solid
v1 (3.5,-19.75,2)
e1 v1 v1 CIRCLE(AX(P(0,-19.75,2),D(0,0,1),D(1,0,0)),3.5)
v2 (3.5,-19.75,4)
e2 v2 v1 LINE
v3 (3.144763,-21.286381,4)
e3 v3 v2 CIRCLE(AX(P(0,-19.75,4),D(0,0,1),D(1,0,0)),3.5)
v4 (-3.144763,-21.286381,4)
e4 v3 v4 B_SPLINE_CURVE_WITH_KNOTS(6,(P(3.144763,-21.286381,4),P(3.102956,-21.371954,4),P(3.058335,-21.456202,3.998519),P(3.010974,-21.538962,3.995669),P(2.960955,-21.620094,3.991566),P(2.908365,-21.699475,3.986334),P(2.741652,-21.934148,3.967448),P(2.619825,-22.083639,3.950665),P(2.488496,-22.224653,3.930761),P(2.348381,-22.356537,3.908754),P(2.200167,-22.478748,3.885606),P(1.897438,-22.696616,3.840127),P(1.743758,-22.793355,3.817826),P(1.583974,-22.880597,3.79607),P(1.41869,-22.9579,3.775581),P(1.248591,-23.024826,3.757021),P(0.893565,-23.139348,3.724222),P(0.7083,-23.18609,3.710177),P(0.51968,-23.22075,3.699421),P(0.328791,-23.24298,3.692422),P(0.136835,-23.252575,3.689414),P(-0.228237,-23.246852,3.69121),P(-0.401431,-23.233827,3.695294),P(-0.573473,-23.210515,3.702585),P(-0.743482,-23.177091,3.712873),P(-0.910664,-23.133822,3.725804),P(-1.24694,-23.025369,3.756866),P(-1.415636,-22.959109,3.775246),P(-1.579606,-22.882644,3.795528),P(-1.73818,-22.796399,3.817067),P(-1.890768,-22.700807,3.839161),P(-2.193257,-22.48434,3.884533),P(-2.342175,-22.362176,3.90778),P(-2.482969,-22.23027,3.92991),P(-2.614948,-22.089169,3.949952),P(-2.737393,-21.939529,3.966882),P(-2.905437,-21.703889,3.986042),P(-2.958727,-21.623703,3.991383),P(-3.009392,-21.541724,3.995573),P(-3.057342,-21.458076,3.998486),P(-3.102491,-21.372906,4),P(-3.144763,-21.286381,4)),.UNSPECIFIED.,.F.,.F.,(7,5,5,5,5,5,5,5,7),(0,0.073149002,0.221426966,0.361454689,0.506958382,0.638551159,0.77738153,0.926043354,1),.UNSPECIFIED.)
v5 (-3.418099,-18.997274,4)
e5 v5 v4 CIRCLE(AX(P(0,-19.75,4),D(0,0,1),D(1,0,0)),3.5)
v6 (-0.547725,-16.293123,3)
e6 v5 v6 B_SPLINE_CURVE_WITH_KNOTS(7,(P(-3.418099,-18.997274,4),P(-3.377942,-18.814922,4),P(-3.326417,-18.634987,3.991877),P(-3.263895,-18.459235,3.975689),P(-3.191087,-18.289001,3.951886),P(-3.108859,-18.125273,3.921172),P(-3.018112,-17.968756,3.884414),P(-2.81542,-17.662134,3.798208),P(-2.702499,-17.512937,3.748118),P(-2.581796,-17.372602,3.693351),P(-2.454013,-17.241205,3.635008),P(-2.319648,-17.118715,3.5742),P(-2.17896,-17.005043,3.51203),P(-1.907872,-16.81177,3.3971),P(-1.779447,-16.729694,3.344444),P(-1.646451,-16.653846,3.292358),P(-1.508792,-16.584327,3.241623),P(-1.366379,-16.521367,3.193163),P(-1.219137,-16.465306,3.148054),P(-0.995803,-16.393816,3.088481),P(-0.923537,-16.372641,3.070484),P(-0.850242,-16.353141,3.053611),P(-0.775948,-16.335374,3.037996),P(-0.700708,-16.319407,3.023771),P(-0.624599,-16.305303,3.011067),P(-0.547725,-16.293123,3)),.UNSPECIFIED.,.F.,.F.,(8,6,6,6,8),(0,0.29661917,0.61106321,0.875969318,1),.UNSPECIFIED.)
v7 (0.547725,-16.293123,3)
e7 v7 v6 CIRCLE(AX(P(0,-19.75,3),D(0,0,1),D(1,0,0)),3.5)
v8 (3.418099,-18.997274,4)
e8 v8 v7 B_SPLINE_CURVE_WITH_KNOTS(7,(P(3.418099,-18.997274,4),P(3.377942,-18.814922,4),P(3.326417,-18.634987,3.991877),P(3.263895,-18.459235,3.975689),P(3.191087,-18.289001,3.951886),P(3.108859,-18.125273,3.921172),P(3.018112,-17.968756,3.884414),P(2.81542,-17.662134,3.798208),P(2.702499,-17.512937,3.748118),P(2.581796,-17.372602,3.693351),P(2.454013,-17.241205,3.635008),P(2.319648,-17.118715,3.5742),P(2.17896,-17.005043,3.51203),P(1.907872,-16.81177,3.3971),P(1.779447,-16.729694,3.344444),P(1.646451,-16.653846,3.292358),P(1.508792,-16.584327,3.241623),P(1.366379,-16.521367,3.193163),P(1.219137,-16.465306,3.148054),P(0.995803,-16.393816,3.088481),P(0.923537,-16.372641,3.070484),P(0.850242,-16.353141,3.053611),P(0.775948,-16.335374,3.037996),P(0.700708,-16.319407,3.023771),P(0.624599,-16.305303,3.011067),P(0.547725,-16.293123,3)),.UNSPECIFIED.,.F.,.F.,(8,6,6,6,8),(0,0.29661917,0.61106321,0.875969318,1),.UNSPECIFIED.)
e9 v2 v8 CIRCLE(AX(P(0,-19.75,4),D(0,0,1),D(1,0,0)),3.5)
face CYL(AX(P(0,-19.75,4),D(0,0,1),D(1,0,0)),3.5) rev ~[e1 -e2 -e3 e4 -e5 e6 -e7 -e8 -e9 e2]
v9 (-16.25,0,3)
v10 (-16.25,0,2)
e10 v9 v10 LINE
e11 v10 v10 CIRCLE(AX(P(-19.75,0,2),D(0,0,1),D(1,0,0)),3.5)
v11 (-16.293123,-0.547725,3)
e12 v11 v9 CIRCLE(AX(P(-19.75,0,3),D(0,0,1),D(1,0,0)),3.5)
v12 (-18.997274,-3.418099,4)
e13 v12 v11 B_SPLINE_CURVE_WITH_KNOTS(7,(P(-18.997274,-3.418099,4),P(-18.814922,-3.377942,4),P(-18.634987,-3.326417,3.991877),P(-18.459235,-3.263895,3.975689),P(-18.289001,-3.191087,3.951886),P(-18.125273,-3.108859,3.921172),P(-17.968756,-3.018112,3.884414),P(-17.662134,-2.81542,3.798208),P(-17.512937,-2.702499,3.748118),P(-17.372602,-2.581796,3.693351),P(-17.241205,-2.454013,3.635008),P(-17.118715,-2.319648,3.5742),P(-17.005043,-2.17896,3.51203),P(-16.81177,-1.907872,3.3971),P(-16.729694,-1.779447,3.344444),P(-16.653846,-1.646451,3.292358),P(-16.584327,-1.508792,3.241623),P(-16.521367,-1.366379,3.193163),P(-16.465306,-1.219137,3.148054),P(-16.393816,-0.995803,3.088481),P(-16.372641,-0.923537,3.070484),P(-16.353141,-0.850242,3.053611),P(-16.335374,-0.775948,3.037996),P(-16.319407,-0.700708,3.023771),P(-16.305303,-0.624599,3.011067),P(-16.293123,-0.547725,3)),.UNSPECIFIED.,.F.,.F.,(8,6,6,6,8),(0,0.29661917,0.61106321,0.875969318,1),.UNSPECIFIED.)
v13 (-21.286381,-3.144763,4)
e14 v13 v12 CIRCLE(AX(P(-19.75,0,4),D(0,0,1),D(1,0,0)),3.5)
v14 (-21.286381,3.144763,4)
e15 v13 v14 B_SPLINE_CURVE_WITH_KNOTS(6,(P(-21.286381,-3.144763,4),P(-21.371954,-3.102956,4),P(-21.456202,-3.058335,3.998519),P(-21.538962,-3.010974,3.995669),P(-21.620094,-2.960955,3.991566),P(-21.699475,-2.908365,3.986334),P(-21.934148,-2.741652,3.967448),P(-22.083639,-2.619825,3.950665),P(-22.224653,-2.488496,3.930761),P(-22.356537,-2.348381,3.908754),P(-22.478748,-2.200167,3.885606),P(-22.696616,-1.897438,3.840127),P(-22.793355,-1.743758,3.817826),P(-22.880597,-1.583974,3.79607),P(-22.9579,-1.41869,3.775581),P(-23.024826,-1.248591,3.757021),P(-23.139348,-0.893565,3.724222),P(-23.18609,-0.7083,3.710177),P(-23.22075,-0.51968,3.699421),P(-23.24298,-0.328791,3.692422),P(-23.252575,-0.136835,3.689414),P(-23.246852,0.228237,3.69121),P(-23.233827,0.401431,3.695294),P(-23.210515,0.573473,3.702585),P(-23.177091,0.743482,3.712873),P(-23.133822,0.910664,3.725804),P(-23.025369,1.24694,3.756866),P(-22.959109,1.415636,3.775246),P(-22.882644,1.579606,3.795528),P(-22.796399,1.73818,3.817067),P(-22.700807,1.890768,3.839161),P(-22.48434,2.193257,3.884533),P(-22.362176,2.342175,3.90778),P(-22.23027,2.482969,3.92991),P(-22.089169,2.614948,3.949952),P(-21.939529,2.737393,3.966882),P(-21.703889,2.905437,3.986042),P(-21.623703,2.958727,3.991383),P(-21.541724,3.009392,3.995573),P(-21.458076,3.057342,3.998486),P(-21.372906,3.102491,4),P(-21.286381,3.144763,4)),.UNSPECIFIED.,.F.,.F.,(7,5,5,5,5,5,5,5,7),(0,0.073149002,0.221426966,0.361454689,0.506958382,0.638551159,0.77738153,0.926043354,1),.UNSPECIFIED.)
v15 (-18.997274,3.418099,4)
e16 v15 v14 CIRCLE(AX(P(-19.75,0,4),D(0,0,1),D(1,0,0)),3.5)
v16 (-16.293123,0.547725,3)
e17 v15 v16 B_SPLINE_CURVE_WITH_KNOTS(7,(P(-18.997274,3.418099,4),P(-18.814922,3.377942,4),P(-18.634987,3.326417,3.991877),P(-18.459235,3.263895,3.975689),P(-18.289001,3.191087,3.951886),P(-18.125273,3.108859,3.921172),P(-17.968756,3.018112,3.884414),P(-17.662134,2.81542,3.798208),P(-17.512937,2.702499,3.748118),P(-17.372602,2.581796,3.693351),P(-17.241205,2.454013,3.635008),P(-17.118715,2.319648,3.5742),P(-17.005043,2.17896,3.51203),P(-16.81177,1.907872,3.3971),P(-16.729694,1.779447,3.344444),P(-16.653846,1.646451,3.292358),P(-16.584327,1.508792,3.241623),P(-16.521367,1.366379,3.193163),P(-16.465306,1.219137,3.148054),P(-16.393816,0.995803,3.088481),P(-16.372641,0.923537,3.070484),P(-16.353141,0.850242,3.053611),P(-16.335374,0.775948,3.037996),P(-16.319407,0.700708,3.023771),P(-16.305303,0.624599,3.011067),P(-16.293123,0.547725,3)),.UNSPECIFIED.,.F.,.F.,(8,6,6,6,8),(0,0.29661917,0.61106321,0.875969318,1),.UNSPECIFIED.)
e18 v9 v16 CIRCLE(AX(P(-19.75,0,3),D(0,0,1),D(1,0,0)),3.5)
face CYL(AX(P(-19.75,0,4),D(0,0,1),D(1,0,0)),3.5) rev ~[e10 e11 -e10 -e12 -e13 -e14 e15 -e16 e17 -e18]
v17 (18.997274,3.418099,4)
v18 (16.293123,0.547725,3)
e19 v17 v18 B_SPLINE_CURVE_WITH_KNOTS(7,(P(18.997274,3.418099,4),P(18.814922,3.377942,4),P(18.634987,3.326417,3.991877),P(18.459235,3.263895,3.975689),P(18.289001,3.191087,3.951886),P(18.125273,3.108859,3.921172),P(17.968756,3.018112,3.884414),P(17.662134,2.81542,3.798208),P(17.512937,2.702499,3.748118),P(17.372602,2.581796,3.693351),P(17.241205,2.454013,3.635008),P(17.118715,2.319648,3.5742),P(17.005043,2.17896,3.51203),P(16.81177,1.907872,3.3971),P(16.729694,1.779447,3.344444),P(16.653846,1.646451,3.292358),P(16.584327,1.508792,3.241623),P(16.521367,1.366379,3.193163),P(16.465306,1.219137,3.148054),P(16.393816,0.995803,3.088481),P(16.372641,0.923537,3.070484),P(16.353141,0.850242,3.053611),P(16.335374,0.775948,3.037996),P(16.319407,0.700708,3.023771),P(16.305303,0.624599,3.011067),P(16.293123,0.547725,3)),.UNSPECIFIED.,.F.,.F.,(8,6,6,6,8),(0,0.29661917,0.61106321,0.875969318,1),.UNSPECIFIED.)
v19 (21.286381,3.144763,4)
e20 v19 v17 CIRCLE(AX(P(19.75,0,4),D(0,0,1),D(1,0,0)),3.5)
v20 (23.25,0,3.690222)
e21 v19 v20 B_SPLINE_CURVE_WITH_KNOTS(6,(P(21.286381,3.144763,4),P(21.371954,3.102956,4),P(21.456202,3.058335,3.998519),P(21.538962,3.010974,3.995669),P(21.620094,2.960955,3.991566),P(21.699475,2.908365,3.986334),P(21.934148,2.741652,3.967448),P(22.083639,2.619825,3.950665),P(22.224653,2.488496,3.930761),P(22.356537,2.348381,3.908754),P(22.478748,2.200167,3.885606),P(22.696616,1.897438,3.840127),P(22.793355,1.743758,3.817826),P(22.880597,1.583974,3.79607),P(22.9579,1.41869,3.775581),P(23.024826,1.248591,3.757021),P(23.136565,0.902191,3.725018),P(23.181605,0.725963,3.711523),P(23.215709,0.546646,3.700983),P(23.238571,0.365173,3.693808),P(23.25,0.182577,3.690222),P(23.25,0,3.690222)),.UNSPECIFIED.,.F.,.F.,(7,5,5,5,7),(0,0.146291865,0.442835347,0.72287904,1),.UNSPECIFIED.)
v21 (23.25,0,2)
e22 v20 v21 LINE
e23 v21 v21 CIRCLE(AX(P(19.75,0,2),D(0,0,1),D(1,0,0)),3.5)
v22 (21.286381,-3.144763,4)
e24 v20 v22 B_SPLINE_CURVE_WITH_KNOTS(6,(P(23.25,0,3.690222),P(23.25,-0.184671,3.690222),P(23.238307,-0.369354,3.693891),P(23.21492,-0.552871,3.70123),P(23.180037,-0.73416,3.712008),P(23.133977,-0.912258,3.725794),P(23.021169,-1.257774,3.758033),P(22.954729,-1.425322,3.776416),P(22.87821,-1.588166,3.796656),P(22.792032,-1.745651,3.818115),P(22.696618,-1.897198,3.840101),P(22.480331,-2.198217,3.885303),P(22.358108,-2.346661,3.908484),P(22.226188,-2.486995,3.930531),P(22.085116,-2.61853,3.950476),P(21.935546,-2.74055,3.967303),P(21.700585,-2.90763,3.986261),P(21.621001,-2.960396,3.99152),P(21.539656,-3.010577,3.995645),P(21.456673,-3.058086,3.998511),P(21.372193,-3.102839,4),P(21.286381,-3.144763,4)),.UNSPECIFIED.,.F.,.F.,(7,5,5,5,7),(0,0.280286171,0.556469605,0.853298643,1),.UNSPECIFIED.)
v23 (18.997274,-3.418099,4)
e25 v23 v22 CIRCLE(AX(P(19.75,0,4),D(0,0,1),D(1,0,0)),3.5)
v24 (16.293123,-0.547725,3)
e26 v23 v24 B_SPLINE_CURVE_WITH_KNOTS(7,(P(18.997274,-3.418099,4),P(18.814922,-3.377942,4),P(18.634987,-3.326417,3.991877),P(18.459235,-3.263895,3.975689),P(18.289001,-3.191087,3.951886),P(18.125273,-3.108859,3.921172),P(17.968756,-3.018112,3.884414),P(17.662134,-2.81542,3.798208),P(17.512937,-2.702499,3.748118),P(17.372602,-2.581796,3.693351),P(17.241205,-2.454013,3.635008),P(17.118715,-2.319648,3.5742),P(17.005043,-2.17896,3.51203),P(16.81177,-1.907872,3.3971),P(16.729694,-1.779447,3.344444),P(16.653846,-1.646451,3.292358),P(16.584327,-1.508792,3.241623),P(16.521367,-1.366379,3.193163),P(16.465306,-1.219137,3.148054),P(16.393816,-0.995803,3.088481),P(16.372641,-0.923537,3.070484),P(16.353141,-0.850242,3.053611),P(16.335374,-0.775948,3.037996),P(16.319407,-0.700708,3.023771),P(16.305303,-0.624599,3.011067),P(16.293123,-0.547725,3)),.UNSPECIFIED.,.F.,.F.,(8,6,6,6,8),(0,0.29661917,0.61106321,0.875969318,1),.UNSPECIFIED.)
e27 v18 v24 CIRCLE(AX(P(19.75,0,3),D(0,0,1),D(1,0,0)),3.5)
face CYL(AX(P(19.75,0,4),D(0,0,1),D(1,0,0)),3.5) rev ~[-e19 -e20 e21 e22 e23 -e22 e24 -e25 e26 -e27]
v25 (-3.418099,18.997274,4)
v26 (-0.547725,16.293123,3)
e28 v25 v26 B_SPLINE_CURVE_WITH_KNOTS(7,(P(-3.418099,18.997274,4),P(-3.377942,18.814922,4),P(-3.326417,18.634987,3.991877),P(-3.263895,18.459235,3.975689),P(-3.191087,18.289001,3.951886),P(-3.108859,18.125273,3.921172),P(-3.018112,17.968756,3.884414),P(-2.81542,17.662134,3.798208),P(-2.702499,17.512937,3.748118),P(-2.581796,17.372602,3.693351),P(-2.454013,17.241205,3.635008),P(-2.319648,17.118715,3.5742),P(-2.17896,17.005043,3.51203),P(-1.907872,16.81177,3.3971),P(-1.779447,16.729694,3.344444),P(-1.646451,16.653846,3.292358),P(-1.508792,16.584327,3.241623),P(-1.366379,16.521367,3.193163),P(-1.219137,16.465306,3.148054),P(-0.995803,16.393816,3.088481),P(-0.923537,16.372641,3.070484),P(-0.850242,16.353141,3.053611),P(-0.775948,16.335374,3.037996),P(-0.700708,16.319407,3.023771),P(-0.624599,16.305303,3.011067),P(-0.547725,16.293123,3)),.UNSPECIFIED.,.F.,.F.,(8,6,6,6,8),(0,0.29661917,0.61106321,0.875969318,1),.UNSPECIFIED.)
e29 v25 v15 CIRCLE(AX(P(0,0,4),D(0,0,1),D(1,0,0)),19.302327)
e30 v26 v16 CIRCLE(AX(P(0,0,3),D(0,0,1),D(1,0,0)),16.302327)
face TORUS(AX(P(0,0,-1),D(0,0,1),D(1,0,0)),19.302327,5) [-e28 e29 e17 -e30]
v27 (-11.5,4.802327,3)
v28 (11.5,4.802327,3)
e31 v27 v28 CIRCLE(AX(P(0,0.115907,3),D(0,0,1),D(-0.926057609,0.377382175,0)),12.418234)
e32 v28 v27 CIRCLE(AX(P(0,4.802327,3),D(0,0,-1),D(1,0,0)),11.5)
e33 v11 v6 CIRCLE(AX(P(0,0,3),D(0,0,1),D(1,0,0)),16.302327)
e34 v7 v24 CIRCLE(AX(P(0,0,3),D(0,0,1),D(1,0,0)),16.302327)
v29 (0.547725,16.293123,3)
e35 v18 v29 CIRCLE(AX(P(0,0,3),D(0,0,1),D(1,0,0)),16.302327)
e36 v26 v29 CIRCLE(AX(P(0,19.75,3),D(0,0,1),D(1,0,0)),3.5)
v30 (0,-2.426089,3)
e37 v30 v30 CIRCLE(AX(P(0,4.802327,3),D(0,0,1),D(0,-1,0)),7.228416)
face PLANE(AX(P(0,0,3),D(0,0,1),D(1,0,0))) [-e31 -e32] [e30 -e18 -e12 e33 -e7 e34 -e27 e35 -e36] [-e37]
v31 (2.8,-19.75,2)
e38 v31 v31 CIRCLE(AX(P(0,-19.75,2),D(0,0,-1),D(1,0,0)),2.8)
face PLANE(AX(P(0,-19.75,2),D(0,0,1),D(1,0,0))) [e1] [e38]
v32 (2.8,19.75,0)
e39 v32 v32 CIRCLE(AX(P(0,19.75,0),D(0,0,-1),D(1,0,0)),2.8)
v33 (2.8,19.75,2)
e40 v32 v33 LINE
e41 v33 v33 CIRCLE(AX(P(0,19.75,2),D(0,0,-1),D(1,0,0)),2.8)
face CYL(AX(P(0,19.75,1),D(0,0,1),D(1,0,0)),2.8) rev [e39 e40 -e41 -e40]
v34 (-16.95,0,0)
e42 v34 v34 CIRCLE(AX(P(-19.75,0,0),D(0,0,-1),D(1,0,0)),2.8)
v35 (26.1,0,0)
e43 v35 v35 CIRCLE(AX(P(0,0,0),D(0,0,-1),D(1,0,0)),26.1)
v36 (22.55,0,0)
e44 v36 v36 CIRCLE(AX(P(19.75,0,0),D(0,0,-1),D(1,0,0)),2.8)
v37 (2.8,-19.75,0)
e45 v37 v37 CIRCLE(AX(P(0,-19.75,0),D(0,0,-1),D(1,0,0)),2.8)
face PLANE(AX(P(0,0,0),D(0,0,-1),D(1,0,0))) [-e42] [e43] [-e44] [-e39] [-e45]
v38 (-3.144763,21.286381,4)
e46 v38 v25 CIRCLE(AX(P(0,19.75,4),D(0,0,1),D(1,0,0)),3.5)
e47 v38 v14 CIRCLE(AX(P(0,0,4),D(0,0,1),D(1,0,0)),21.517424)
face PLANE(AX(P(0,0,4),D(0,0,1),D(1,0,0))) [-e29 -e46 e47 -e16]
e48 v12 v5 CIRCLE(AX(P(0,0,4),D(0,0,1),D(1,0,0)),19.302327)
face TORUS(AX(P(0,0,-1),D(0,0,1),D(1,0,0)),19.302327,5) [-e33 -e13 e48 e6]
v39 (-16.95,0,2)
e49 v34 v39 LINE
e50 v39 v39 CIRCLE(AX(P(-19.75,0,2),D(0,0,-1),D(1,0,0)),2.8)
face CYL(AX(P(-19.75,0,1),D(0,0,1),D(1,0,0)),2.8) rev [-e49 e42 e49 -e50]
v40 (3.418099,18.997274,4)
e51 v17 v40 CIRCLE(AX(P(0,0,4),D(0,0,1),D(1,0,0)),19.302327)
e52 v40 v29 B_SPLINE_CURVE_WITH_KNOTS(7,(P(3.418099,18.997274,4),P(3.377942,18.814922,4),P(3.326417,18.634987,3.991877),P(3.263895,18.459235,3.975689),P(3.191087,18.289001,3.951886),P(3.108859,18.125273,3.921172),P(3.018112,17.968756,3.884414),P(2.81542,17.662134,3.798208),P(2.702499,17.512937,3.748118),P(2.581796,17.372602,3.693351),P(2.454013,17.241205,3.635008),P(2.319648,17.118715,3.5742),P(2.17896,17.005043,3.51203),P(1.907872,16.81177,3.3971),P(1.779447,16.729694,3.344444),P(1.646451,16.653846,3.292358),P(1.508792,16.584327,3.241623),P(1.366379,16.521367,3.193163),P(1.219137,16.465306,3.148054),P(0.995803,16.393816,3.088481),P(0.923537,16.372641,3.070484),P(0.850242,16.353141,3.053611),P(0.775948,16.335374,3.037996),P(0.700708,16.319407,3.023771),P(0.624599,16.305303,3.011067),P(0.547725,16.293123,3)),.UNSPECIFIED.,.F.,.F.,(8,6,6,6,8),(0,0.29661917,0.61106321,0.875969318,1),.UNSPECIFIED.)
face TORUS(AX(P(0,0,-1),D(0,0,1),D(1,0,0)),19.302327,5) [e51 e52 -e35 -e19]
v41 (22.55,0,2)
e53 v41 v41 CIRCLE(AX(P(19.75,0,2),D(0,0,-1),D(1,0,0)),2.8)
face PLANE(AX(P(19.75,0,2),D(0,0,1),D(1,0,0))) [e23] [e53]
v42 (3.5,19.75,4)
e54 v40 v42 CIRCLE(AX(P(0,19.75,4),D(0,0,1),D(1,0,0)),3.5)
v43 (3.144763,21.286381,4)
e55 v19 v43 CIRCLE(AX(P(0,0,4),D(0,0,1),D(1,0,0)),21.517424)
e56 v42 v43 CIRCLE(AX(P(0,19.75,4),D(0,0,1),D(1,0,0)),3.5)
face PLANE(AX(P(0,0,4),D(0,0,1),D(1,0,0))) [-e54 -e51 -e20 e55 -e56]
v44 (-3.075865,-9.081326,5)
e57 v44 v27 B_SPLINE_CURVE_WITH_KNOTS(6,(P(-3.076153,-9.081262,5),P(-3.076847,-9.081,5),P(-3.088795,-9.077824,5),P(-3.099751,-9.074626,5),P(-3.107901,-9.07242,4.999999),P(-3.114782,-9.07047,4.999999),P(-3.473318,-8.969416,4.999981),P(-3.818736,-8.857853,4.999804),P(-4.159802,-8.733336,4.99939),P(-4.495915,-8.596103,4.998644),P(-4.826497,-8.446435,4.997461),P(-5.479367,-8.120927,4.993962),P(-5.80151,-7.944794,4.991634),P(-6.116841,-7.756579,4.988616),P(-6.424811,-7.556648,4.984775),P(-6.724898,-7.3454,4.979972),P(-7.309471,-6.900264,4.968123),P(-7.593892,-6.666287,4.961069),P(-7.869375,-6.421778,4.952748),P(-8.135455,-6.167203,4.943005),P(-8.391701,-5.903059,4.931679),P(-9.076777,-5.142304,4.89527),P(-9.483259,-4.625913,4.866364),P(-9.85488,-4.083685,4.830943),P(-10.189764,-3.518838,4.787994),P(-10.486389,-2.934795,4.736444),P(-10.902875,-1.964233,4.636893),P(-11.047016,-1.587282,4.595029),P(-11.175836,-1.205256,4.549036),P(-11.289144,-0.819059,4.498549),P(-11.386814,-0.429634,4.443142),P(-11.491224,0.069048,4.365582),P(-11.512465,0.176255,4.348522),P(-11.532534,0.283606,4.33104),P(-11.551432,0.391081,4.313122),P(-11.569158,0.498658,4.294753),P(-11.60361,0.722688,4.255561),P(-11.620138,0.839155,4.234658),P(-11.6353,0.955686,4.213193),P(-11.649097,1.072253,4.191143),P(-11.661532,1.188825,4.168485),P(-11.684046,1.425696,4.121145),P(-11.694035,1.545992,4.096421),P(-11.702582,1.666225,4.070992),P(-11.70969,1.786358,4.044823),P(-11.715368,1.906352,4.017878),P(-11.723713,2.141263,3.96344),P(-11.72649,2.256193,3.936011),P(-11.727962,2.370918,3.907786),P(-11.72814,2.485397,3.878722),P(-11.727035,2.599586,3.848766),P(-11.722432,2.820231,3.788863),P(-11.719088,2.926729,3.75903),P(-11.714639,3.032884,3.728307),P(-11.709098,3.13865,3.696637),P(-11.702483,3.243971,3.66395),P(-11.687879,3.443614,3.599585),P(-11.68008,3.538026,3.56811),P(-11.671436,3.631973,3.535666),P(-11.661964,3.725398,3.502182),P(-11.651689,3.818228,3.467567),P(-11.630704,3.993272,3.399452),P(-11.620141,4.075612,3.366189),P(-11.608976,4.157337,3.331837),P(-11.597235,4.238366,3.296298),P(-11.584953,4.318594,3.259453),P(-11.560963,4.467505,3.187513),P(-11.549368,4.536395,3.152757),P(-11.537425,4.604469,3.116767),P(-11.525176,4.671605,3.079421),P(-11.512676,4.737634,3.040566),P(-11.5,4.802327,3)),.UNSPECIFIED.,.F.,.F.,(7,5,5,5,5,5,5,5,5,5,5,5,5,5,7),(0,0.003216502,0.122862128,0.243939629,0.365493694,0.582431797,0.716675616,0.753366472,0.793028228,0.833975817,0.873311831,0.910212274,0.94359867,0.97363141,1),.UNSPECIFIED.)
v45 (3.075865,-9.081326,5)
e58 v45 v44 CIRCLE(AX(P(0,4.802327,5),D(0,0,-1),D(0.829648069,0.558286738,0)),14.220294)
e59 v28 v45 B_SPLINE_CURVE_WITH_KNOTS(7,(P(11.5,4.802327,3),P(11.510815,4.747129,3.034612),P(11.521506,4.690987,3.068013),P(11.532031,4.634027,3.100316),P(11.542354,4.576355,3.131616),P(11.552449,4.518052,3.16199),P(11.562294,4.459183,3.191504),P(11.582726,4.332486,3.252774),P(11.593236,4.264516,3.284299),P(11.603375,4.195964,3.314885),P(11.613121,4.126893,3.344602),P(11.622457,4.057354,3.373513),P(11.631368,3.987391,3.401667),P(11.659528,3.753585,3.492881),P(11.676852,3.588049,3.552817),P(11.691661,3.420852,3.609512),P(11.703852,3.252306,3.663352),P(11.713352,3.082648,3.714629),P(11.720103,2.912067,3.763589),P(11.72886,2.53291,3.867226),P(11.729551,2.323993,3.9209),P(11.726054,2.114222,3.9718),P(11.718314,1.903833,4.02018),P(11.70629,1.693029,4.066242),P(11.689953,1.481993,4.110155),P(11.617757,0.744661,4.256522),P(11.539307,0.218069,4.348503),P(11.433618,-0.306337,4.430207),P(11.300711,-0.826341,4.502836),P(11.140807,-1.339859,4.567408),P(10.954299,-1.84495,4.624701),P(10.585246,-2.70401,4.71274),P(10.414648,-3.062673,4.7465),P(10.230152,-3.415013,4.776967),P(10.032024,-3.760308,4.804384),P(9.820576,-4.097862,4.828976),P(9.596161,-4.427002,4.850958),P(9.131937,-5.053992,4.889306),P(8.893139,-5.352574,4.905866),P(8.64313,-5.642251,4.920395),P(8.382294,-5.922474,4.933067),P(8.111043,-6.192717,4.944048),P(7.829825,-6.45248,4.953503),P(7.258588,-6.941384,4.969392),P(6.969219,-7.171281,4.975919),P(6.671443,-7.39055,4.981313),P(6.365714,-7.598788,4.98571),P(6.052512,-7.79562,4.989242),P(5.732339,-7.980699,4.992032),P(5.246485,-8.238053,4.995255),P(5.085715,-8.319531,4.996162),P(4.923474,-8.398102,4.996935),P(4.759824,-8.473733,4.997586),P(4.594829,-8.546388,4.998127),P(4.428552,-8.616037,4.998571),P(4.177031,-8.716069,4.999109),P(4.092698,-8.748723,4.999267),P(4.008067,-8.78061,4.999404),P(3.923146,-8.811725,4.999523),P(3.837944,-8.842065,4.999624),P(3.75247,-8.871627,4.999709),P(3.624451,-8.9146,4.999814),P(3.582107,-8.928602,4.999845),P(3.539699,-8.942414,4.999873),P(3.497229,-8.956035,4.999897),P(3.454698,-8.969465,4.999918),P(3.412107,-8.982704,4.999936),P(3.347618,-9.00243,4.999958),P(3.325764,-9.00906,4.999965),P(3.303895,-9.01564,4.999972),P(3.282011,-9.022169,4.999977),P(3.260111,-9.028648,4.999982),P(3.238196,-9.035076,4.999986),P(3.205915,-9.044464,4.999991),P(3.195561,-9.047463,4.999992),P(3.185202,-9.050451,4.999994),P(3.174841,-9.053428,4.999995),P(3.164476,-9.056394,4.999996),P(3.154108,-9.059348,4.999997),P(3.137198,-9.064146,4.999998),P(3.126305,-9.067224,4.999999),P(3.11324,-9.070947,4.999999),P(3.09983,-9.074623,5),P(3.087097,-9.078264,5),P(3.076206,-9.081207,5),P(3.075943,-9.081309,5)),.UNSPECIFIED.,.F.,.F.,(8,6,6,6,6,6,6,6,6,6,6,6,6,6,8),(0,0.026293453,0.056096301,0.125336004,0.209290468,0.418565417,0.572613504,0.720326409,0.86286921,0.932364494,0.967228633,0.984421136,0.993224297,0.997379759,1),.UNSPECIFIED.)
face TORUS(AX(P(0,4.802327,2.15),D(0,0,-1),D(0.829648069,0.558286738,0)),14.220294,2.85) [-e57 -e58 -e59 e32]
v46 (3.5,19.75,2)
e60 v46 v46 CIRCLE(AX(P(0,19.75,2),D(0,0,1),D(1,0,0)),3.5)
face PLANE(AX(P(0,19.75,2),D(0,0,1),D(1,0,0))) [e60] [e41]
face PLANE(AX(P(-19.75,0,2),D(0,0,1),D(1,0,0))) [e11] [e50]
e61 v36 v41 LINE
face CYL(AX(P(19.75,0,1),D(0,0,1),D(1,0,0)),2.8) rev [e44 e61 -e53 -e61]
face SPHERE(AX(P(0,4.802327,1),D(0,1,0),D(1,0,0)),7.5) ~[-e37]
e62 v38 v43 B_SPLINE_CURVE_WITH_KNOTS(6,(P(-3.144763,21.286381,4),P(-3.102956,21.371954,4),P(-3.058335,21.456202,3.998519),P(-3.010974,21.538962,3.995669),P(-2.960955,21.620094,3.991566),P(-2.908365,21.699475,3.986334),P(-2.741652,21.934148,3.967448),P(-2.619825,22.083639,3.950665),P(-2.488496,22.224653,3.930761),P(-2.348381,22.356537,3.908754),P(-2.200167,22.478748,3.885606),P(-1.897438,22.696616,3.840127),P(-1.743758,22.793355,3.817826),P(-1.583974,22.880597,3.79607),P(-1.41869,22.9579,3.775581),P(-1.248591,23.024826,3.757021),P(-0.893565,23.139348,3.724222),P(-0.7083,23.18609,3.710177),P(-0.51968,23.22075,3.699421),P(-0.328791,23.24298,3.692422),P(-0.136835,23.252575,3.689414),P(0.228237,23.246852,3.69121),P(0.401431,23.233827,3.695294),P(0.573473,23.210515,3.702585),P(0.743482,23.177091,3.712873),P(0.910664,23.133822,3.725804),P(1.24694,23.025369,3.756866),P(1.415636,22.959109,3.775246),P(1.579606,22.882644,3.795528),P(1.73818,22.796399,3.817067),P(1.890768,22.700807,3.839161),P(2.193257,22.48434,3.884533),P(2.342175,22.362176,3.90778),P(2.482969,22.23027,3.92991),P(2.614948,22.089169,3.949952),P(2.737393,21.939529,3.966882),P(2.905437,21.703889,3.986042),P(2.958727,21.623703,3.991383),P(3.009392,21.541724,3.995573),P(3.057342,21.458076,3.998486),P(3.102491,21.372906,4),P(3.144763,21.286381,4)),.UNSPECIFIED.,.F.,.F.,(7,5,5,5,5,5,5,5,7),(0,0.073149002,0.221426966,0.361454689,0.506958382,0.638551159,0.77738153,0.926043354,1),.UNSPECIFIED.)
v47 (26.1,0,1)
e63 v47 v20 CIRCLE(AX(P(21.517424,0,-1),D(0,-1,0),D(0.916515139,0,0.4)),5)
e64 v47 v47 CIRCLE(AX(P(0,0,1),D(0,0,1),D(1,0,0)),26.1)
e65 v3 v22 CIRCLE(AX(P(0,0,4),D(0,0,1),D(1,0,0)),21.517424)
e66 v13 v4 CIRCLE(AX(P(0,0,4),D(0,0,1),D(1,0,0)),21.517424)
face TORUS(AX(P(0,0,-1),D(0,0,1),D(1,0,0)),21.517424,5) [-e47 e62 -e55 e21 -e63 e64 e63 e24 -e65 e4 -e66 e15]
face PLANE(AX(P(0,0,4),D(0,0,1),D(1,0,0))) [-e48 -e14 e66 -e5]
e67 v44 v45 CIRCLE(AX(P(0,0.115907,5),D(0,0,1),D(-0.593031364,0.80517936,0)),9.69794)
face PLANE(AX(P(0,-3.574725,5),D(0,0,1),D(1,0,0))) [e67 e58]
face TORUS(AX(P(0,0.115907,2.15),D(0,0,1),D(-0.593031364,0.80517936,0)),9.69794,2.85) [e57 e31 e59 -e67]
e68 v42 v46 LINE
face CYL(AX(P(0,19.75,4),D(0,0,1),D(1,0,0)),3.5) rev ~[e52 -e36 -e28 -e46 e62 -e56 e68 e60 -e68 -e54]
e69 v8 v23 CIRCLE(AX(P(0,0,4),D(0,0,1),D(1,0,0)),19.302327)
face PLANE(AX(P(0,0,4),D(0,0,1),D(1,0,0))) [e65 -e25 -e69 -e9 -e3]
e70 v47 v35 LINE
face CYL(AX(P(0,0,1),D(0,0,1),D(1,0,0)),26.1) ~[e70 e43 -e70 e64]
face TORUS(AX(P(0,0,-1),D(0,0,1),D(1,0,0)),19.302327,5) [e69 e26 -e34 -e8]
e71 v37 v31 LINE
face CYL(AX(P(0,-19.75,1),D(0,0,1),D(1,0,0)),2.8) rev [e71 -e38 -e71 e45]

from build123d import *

# Parameters (mm, degrees)
F0_R        = 26.1
F1_DEPTH    = 3
F2_R        = 16.3023270164
F3_DEPTH    = 1
F5_R        = 2.8
F6_DEPTH    = 3.0010001
F8_DEPTH    = 2
F9_T2_ANGLE = 247.8747937478
F9_T4_ANGLE = 287.2551612694
F11_R       = 3.5
F12_DEPTH   = 2
F14_ANGLE   = 180
F16_R       = 26.1
F16_R_2     = 2.8
F17_DEPTH   = 1


# Not quite as in the source:
# - a fillet or chamfer that OpenCascade refuses, or shapes differently, is made with other operations: its cross-section is extruded or revolved along the edge and cut away or added


with BuildPart() as f1:
    # F0 (on Top) → F1 (new body)
    with BuildSketch(Plane.XY):
        Circle(F0_R)
    extrude(amount=F1_DEPTH)

    # F2 (on face) → F3 (cut)
    with BuildSketch(Plane.XY.offset(3)):
        Circle(F2_R)
    extrude(amount=-F3_DEPTH, mode=Mode.SUBTRACT)

    # F4: fillet of radius 5 on 2 edges, made by hand

    # F4_s1 → F4_t2 (revolve, cut)
    with BuildSketch(Plane.XZ):
        with BuildLine():
            ThreePointArc((26.1, 0), (24.2560370926, 2.1833001327), (21.517424305, 3))
            Line((21.517424305, 3), (26.1, 3))
            Line((26.1, 3), (26.1, 0))
        make_face()
    revolve(axis=Axis((0, 0, 3), (0, 0, 1)), mode=Mode.SUBTRACT)

    # F4_s3 → F4_t4 (revolve, cut)
    with BuildSketch(Plane.XZ):
        with BuildLine():
            ThreePointArc((19.3023270164, 3), (17.7211881863, 2.7434164903), (16.3023270164, 2))
            Line((16.3023270164, 2), (16.3023270164, 3))
            Line((16.3023270164, 3), (19.3023270164, 3))
        make_face()
    revolve(axis=Axis((0, 0, 3), (0, 0, 1)), mode=Mode.SUBTRACT)

    # F5 (on Top) → F6 (cut, through all)
    with BuildSketch(Plane.XY):
        with Locations((0, 19.75)):
            Circle(F5_R)
        with Locations((-19.75, 0)):
            Circle(F5_R)
        with Locations((0, -19.75)):
            Circle(F5_R)
        with Locations((19.75, 0)):
            Circle(F5_R)
    extrude(amount=F6_DEPTH, mode=Mode.SUBTRACT)

    # F7 (on face) → F8 (join)
    with BuildSketch(Plane.XY.offset(2)):
        with BuildLine():
            ThreePointArc((11.5, 4.8023270164), (0, -6.6976729836), (-11.5, 4.8023270164))
            ThreePointArc((-11.5, 4.8023270164), (0, -12.3023270164), (11.5, 4.8023270164))
        make_face()
    extrude(amount=F8_DEPTH)

    # F9: fillet of radius 2.85 on 2 edges, made by hand

    # F9_s1 → F9_t2 (revolve, cut)
    with BuildSketch(Plane(origin=(-2.2243490984, 3.3055181298, 0), x_dir=(0, 0, 1), z_dir=(-0.558286738, 0.8296480689, 0))):
        with BuildLine():
            ThreePointArc((2, 14.1810754847), (3.4461925006, 15.2131752848), (4, 16.9013695864))
            Line((4, 16.9013695864), (4, 14.1810754847))
            Line((4, 14.1810754847), (2, 14.1810754847))
        make_face()
    revolve(axis=Axis((0, 4.8023270164, 4), (0, 0, -1)), revolution_arc=F9_T2_ANGLE, mode=Mode.SUBTRACT)

    # F9_s3 → F9_t4 (revolve, cut)
    with BuildSketch(Plane(origin=(0.0553451509, 0.0407628561, 0), x_dir=(0, 0, 1), z_dir=(0.8051793599, 0.5930313638, 0))):
        with BuildLine():
            ThreePointArc((2, -12.5115597549), (3.4461925006, -11.4794599548), (4, -9.7912656532))
            Line((4, -9.7912656532), (4, -12.5115597549))
            Line((4, -12.5115597549), (2, -12.5115597549))
        make_face()
    revolve(axis=Axis((0, 0.1159068972, 4), (0, 0, 1)), revolution_arc=F9_T4_ANGLE, mode=Mode.SUBTRACT)

    # F11 (on offset) → F12 (cut)
    with BuildSketch(Plane.XY.offset(3)):
        with Locations((0, 19.75)):
            Circle(F11_R)
        with Locations((19.75, 0)):
            Circle(F11_R)
        with Locations((0, -19.75)):
            Circle(F11_R)
        with Locations((-19.75, 0)):
            Circle(F11_R)
    extrude(amount=-F12_DEPTH, mode=Mode.SUBTRACT)

    # F13 (on Top) → F14 (revolve)
    with BuildSketch(Plane.XY):
        with BuildLine():
            Line((0, 12.3023270164), (0, -2.6976729836))
            ThreePointArc((0, -2.6976729836), (7.5, 4.8023270164), (0, 12.3023270164))
        make_face()
    revolve(axis=Axis((0, 4.8023270164, 0), (0, -1, 0)), revolution_arc=F14_ANGLE)


with BuildPart() as f1_1:
    # F15: moved
    add(f1.part.moved(Location((0, 0, 1))))

    # F16 (on face) → F17 (join)
    with BuildSketch(Plane(origin=(0, 0, 1), x_dir=(1, 0, 0), z_dir=(0, 0, -1))):
        Circle(F16_R)
        with Locations((0, -19.75)):
            Circle(F16_R_2, mode=Mode.SUBTRACT)
        with Locations((-19.75, 0)):
            Circle(F16_R_2, mode=Mode.SUBTRACT)
        with Locations((19.75, 0)):
            Circle(F16_R_2, mode=Mode.SUBTRACT)
        with Locations((0, 19.75)):
            Circle(F16_R_2, mode=Mode.SUBTRACT)
    extrude(amount=F17_DEPTH)


solid = f1_1.part
